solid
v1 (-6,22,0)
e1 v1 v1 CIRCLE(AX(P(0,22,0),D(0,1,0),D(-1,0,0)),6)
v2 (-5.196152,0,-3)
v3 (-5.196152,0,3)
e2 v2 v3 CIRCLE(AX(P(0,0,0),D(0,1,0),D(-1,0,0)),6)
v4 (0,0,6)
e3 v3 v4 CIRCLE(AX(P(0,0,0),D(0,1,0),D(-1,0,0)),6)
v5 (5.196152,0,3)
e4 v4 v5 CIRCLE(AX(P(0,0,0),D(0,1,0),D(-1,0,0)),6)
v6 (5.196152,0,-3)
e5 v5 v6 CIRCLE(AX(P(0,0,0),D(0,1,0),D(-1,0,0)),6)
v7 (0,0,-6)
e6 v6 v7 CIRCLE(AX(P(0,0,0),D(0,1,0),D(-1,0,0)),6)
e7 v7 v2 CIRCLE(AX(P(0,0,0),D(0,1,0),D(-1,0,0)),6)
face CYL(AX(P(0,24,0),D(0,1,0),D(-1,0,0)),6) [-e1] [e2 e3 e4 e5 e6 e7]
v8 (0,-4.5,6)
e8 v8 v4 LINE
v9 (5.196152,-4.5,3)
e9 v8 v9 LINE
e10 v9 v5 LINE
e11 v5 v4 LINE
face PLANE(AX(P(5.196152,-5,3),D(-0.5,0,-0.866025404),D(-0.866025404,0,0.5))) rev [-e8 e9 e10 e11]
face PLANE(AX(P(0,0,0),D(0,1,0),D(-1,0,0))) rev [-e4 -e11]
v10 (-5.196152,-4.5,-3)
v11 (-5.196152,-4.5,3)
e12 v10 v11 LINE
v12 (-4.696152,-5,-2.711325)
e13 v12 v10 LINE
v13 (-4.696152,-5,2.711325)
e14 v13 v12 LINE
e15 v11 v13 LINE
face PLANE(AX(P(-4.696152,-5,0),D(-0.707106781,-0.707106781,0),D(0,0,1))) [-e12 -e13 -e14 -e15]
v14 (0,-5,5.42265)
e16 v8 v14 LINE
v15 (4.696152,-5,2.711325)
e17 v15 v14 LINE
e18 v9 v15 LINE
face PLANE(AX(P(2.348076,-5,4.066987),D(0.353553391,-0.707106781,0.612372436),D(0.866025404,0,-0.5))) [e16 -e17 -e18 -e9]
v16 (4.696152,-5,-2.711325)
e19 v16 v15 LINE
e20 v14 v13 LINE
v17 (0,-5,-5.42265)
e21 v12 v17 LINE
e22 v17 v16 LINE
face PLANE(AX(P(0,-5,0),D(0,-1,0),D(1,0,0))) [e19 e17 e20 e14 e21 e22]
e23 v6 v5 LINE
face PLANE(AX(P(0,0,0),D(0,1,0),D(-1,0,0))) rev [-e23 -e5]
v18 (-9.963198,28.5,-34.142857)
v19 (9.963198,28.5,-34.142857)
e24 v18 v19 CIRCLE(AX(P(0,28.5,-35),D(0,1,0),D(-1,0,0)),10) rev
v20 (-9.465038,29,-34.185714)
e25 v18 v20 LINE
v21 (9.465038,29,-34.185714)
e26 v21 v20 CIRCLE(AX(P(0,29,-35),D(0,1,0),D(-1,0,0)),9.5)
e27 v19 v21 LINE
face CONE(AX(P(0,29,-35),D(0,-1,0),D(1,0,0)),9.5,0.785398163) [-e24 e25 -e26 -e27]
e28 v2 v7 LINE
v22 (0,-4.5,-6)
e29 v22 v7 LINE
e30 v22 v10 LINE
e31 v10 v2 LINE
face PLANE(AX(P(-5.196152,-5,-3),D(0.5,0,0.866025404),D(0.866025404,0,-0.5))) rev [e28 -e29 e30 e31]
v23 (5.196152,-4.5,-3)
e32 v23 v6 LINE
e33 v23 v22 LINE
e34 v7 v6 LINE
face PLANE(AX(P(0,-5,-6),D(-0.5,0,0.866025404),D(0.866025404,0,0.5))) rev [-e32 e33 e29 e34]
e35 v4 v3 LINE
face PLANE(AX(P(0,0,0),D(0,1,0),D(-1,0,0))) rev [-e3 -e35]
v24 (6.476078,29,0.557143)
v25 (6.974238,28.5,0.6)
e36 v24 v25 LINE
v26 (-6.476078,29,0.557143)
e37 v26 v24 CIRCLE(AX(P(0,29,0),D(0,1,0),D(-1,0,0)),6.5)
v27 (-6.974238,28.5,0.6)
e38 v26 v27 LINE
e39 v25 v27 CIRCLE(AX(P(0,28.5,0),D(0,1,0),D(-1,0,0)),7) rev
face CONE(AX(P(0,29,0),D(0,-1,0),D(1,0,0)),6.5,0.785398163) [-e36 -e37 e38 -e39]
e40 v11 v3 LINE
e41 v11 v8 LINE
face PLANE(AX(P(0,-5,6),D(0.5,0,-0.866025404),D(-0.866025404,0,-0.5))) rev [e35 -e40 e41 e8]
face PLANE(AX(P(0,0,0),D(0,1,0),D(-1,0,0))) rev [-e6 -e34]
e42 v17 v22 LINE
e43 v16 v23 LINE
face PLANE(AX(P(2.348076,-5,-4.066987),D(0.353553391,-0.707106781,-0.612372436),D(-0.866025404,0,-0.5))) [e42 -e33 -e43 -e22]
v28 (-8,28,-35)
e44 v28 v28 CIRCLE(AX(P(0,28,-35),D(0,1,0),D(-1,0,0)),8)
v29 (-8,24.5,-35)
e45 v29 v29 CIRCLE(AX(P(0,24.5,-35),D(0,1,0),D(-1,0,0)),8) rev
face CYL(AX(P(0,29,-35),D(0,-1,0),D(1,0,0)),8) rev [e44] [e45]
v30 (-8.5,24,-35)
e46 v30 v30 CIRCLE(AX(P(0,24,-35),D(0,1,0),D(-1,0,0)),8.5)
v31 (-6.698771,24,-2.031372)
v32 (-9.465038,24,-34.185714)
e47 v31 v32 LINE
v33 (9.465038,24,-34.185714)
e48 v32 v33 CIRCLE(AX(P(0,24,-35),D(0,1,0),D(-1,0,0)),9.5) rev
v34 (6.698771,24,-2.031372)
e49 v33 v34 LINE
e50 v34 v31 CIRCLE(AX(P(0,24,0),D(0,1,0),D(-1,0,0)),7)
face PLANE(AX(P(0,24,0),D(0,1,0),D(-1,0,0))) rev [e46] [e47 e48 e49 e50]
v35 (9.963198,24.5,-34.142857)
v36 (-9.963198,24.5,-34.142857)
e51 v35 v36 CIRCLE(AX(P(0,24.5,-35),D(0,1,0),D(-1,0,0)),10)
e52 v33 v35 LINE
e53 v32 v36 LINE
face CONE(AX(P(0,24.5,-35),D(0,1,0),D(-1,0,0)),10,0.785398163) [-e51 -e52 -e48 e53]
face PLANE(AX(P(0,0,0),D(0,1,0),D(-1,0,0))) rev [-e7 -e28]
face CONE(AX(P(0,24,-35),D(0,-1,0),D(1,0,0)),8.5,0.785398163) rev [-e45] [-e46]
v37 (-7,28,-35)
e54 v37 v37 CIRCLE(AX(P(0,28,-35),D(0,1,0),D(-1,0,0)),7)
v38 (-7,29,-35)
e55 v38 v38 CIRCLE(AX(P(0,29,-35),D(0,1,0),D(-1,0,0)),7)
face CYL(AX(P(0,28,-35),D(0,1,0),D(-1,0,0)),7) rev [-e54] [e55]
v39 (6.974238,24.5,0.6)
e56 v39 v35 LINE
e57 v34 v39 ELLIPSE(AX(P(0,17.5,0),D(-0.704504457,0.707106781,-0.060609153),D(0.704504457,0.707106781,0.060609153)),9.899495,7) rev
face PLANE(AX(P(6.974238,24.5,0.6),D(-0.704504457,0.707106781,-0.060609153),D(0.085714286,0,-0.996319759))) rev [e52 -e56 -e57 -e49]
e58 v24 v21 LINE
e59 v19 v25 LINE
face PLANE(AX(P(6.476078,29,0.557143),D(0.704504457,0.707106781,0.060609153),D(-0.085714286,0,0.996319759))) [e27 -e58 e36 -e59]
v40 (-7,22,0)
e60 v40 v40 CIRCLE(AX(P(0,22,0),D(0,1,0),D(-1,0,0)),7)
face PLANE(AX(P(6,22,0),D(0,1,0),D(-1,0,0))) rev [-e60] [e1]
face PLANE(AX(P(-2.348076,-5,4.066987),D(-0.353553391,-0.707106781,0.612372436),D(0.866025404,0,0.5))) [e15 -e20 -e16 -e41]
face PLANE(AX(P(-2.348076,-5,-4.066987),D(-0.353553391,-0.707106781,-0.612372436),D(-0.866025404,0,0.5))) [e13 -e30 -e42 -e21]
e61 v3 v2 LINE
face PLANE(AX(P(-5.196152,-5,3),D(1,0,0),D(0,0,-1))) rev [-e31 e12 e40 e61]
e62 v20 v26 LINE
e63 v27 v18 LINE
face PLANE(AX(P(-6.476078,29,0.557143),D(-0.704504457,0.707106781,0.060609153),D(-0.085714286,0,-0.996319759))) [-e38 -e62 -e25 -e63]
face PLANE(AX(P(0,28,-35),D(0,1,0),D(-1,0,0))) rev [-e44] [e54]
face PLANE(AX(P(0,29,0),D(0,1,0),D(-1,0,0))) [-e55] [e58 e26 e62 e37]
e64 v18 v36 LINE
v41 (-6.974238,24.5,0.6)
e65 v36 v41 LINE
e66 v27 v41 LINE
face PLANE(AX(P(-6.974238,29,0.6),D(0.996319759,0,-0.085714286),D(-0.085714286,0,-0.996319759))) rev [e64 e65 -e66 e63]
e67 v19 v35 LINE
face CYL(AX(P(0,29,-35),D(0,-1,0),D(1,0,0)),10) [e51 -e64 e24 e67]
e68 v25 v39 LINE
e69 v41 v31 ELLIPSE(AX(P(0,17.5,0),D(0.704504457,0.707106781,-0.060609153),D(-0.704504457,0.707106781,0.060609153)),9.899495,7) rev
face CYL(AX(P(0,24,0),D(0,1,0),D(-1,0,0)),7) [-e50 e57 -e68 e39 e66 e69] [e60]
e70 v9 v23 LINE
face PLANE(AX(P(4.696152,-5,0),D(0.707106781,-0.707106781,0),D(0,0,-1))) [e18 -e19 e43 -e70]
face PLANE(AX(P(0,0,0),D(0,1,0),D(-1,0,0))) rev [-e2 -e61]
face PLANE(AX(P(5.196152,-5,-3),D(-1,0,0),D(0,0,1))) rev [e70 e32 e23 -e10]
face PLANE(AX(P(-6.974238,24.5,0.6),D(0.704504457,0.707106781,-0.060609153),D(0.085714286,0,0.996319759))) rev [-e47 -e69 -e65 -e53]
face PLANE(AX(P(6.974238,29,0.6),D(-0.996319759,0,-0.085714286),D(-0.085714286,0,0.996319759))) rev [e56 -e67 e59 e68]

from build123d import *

# Parameters (mm, degrees)
BOSS_EXTRUDE3_DEPTH = 5
BOSS_EXTRUDE1_START = 5
SKETCH2_R           = 8
BOSS_EXTRUDE1_DEPTH = 5
SKETCH3_R           = 8
SKETCH3_R_2         = 7
BOSS_EXTRUDE2_DEPTH = 1
CHAMFER1_SIZE       = 0.5


with BuildPart() as part:
    # Sketch1 → Revolve1 (revolve)
    with BuildSketch(Plane.XY, mode=Mode.PRIVATE) as revolve1_sk:
        Polygon((0, 0), (6, 0), (6, 22), (7, 22), (7, 24), (0, 24), align=None)
    revolve(revolve1_sk.sketch.rotate(Axis((0, 24, 0), (0, -1, 0)), 180), axis=Axis((0, 24, 0), (0, -1, 0)))

    # Sketch4 → Boss-Extrude3 (add)
    with BuildSketch(Plane.XZ):
        Polygon((0, 6), (-5.196152423, 3), (-5.196152423, -3), (0, -6), (5.196152423, -3), (5.196152423, 3), align=None)
    extrude(amount=BOSS_EXTRUDE3_DEPTH)

    # Sketch2 → Boss-Extrude1 (add)
    with BuildSketch(Plane(origin=(0, 24, 0), x_dir=(1, 0, 0), z_dir=(0, 1, 0)).offset(BOSS_EXTRUDE1_START)):
        with BuildLine():
            Line((-6.97423831, -0.6), (-9.963197585, 34.142857143))
            ThreePointArc((-9.963197585, 34.142857143), (0, 45), (9.963197585, 34.142857143))
            Line((9.963197585, 34.142857143), (6.97423831, -0.6))
            ThreePointArc((6.97423831, -0.6), (0, -7), (-6.97423831, -0.6))
        make_face()
        with Locations(Location((0, 35, 0), (0, 0, 180))):
            Circle(SKETCH2_R, mode=Mode.SUBTRACT)
    extrude(amount=-BOSS_EXTRUDE1_DEPTH)

    # Sketch3 → Boss-Extrude2 (add)
    with BuildSketch(Plane(origin=(0, 29, 0), x_dir=(1, 0, 0), z_dir=(0, 1, 0))):
        with Locations(Location((0, 35, 0), (0, 0, 180))):
            Circle(SKETCH3_R)
        with Locations(Location((0, 35, 0), (0, 0, 180))):
            Circle(SKETCH3_R_2, mode=Mode.SUBTRACT)
    extrude(amount=-BOSS_EXTRUDE2_DEPTH)

    # Chamfer1
    # the kernel refuses this chamfer: 0.5 mm, written as the material it takes off along each edge
    with BuildSketch(Plane(origin=(6.309723822, -5, 2.357079253), x_dir=(-0.49981095845564877, -0.027495876610585633, -0.86569797422488), z_dir=(-0.8660254037844385, 0, 0.5000000000000004)), Plane(origin=(-1.113571399, -5, -6.642920747), x_dir=(-0.4998109584556486, -0.0274958766105856, 0.8656979742248803), z_dir=(0.8660254037844386, 0, 0.5000000000000002)), Plane(origin=(5.196152423, -5, -4.285841494), x_dir=(-0.9996219169112968, -0.027495876610585647, 0), z_dir=(0, 0, 1))) as chamfer1_piece_1:
        Polygon((CHAMFER1_SIZE * 0.999621916911, -CHAMFER1_SIZE * 0.0274958766106), (-CHAMFER1_SIZE * 0.0274958766106, -CHAMFER1_SIZE * 0.999621916911), (0, 0), align=None)
    extrude(amount=8.571682988, mode=Mode.SUBTRACT)
    with BuildSketch(Plane(origin=(1.113571399, -5, 6.642920747), x_dir=(-0.013747938305293307, 0.9996219169112968, 0.02381212764409039), z_dir=(-0.8660254037844385, 0, -0.5000000000000004)), Plane(origin=(-5.196152423, -5, 4.285841494), x_dir=(-0.027495876610585647, 0.9996219169112968, 0), z_dir=(0, 0, -1)), Plane(origin=(-6.309723822, -5, -2.357079253), x_dir=(-0.013747938305292924, 0.9996219169112968, -0.023812127644089753), z_dir=(0.8660254037844386, 0, -0.5000000000000001))) as chamfer1_piece_2:
        Polygon((CHAMFER1_SIZE * 0.999621916911, CHAMFER1_SIZE * 0.0274958766106), (-CHAMFER1_SIZE * 0.0274958766106, CHAMFER1_SIZE * 0.999621916911), (0, 0), align=None)
    extrude(amount=8.571682988, mode=Mode.SUBTRACT)
    with BuildSketch(Plane(origin=(0, 24, -35), x_dir=(-1, 0, 0), z_dir=(0, 0, -1))) as chamfer1_piece_3:
        Polygon((8 + CHAMFER1_SIZE, 0), (8, CHAMFER1_SIZE), (8, 0), align=None)
    revolve(axis=Axis((0, 24, -35), (0, 1, 0)), mode=Mode.SUBTRACT)
    with BuildSketch(Plane(origin=(0, 29, 0), x_dir=(0.9963197585235825, 0, 0.08571428571428559), z_dir=(0.08571428571428559, 0, -0.9963197585235825))) as chamfer1_piece_4:
        Polygon((7, CHAMFER1_SIZE), (7 - CHAMFER1_SIZE, 0), (7, 0), align=None)
    revolve(axis=Axis((0, 29, 0), (0, -1, 0)), revolution_arc=170.165799329, mode=Mode.SUBTRACT)
    with BuildSketch(Plane(origin=(9.963197585, 29, -34.142857143), x_dir=(0.027394685145053735, -0.9996219169112968, 0.002356789423764555), z_dir=(-0.08571428571428572, 0, 0.9963197585235826)), Plane(origin=(-6.97423831, 29, 0.6), x_dir=(-0.027394685145053995, -0.9996219169112968, 0.0023567894237645753), z_dir=(-0.08571428571428566, 0, -0.9963197585235826))) as chamfer1_piece_5:
        Polygon((CHAMFER1_SIZE * 0.999621916911, -CHAMFER1_SIZE * 0.0274958766106), (-CHAMFER1_SIZE * 0.0274958766106, -CHAMFER1_SIZE * 0.999621916911), (0, 0), align=None)
    extrude(amount=34.871191548, mode=Mode.SUBTRACT)
    with BuildSketch(Plane(origin=(0, 29, -35), x_dir=(-0.9963197585235826, 0, 0.08571428571428541), z_dir=(0.08571428571428541, 0, 0.9963197585235826))) as chamfer1_piece_6:
        Polygon((10, CHAMFER1_SIZE), (10 - CHAMFER1_SIZE, 0), (10, 0), align=None)
    revolve(axis=Axis((0, 29, -35), (0, -1, 0)), revolution_arc=189.834200671, mode=Mode.SUBTRACT)
    with BuildSketch(Plane(origin=(9.963197585, 24, -34.142857143), x_dir=(-0.9959430668719438, -0.027495876610589047, -0.08568187859239684), z_dir=(-0.08571428571428572, 0, 0.9963197585235826))) as chamfer1_piece_7_section:
        Polygon((CHAMFER1_SIZE * 0.999621916911, -CHAMFER1_SIZE * 0.0274958766106), (-CHAMFER1_SIZE * 0.0274958766106, -CHAMFER1_SIZE * 0.999621916911), (0, 0), align=None)
    chamfer1_piece_7 = extrude(amount=36.157033042, mode=Mode.PRIVATE)
    chamfer1_piece_7 = chamfer1_piece_7 - Plane(origin=(0, 24.16673509, 0), x_dir=(-1, 0, 0), z_dir=(0, 1, 0)) * Cylinder(7, 75, mode=Mode.PRIVATE)
    add(chamfer1_piece_7, mode=Mode.SUBTRACT)
    with BuildSketch(Plane(origin=(0, 24, -35), x_dir=(-0.9963197585235826, 0, 0.08571428571428541), z_dir=(0.08571428571428541, 0, 0.9963197585235826))) as chamfer1_piece_8:
        Polygon((10 - CHAMFER1_SIZE, 0), (10, -CHAMFER1_SIZE), (10, 0), align=None)
    revolve(axis=Axis((0, 24, -35), (0, -1, 0)), revolution_arc=189.834200671, mode=Mode.SUBTRACT)
    with BuildSketch(Plane(origin=(-6.864023324, 24, 1.881109287), x_dir=(0.9959430668719438, -0.02749587661058904, -0.0856818785923968), z_dir=(-0.08571428571428566, 0, -0.9963197585235826))) as chamfer1_piece_9_section:
        Polygon((CHAMFER1_SIZE * 0.999621916911, -CHAMFER1_SIZE * 0.0274958766106), (-CHAMFER1_SIZE * 0.0274958766106, -CHAMFER1_SIZE * 0.999621916911), (0, 0), align=None)
    chamfer1_piece_9 = extrude(amount=36.157033042, mode=Mode.PRIVATE)
    chamfer1_piece_9 = chamfer1_piece_9 - Plane(origin=(0, 24.166735092, 0), x_dir=(-1, 0, 0), z_dir=(0, 1, 0)) * Cylinder(7, 75, mode=Mode.PRIVATE)
    add(chamfer1_piece_9, mode=Mode.SUBTRACT)


solid = part.part
